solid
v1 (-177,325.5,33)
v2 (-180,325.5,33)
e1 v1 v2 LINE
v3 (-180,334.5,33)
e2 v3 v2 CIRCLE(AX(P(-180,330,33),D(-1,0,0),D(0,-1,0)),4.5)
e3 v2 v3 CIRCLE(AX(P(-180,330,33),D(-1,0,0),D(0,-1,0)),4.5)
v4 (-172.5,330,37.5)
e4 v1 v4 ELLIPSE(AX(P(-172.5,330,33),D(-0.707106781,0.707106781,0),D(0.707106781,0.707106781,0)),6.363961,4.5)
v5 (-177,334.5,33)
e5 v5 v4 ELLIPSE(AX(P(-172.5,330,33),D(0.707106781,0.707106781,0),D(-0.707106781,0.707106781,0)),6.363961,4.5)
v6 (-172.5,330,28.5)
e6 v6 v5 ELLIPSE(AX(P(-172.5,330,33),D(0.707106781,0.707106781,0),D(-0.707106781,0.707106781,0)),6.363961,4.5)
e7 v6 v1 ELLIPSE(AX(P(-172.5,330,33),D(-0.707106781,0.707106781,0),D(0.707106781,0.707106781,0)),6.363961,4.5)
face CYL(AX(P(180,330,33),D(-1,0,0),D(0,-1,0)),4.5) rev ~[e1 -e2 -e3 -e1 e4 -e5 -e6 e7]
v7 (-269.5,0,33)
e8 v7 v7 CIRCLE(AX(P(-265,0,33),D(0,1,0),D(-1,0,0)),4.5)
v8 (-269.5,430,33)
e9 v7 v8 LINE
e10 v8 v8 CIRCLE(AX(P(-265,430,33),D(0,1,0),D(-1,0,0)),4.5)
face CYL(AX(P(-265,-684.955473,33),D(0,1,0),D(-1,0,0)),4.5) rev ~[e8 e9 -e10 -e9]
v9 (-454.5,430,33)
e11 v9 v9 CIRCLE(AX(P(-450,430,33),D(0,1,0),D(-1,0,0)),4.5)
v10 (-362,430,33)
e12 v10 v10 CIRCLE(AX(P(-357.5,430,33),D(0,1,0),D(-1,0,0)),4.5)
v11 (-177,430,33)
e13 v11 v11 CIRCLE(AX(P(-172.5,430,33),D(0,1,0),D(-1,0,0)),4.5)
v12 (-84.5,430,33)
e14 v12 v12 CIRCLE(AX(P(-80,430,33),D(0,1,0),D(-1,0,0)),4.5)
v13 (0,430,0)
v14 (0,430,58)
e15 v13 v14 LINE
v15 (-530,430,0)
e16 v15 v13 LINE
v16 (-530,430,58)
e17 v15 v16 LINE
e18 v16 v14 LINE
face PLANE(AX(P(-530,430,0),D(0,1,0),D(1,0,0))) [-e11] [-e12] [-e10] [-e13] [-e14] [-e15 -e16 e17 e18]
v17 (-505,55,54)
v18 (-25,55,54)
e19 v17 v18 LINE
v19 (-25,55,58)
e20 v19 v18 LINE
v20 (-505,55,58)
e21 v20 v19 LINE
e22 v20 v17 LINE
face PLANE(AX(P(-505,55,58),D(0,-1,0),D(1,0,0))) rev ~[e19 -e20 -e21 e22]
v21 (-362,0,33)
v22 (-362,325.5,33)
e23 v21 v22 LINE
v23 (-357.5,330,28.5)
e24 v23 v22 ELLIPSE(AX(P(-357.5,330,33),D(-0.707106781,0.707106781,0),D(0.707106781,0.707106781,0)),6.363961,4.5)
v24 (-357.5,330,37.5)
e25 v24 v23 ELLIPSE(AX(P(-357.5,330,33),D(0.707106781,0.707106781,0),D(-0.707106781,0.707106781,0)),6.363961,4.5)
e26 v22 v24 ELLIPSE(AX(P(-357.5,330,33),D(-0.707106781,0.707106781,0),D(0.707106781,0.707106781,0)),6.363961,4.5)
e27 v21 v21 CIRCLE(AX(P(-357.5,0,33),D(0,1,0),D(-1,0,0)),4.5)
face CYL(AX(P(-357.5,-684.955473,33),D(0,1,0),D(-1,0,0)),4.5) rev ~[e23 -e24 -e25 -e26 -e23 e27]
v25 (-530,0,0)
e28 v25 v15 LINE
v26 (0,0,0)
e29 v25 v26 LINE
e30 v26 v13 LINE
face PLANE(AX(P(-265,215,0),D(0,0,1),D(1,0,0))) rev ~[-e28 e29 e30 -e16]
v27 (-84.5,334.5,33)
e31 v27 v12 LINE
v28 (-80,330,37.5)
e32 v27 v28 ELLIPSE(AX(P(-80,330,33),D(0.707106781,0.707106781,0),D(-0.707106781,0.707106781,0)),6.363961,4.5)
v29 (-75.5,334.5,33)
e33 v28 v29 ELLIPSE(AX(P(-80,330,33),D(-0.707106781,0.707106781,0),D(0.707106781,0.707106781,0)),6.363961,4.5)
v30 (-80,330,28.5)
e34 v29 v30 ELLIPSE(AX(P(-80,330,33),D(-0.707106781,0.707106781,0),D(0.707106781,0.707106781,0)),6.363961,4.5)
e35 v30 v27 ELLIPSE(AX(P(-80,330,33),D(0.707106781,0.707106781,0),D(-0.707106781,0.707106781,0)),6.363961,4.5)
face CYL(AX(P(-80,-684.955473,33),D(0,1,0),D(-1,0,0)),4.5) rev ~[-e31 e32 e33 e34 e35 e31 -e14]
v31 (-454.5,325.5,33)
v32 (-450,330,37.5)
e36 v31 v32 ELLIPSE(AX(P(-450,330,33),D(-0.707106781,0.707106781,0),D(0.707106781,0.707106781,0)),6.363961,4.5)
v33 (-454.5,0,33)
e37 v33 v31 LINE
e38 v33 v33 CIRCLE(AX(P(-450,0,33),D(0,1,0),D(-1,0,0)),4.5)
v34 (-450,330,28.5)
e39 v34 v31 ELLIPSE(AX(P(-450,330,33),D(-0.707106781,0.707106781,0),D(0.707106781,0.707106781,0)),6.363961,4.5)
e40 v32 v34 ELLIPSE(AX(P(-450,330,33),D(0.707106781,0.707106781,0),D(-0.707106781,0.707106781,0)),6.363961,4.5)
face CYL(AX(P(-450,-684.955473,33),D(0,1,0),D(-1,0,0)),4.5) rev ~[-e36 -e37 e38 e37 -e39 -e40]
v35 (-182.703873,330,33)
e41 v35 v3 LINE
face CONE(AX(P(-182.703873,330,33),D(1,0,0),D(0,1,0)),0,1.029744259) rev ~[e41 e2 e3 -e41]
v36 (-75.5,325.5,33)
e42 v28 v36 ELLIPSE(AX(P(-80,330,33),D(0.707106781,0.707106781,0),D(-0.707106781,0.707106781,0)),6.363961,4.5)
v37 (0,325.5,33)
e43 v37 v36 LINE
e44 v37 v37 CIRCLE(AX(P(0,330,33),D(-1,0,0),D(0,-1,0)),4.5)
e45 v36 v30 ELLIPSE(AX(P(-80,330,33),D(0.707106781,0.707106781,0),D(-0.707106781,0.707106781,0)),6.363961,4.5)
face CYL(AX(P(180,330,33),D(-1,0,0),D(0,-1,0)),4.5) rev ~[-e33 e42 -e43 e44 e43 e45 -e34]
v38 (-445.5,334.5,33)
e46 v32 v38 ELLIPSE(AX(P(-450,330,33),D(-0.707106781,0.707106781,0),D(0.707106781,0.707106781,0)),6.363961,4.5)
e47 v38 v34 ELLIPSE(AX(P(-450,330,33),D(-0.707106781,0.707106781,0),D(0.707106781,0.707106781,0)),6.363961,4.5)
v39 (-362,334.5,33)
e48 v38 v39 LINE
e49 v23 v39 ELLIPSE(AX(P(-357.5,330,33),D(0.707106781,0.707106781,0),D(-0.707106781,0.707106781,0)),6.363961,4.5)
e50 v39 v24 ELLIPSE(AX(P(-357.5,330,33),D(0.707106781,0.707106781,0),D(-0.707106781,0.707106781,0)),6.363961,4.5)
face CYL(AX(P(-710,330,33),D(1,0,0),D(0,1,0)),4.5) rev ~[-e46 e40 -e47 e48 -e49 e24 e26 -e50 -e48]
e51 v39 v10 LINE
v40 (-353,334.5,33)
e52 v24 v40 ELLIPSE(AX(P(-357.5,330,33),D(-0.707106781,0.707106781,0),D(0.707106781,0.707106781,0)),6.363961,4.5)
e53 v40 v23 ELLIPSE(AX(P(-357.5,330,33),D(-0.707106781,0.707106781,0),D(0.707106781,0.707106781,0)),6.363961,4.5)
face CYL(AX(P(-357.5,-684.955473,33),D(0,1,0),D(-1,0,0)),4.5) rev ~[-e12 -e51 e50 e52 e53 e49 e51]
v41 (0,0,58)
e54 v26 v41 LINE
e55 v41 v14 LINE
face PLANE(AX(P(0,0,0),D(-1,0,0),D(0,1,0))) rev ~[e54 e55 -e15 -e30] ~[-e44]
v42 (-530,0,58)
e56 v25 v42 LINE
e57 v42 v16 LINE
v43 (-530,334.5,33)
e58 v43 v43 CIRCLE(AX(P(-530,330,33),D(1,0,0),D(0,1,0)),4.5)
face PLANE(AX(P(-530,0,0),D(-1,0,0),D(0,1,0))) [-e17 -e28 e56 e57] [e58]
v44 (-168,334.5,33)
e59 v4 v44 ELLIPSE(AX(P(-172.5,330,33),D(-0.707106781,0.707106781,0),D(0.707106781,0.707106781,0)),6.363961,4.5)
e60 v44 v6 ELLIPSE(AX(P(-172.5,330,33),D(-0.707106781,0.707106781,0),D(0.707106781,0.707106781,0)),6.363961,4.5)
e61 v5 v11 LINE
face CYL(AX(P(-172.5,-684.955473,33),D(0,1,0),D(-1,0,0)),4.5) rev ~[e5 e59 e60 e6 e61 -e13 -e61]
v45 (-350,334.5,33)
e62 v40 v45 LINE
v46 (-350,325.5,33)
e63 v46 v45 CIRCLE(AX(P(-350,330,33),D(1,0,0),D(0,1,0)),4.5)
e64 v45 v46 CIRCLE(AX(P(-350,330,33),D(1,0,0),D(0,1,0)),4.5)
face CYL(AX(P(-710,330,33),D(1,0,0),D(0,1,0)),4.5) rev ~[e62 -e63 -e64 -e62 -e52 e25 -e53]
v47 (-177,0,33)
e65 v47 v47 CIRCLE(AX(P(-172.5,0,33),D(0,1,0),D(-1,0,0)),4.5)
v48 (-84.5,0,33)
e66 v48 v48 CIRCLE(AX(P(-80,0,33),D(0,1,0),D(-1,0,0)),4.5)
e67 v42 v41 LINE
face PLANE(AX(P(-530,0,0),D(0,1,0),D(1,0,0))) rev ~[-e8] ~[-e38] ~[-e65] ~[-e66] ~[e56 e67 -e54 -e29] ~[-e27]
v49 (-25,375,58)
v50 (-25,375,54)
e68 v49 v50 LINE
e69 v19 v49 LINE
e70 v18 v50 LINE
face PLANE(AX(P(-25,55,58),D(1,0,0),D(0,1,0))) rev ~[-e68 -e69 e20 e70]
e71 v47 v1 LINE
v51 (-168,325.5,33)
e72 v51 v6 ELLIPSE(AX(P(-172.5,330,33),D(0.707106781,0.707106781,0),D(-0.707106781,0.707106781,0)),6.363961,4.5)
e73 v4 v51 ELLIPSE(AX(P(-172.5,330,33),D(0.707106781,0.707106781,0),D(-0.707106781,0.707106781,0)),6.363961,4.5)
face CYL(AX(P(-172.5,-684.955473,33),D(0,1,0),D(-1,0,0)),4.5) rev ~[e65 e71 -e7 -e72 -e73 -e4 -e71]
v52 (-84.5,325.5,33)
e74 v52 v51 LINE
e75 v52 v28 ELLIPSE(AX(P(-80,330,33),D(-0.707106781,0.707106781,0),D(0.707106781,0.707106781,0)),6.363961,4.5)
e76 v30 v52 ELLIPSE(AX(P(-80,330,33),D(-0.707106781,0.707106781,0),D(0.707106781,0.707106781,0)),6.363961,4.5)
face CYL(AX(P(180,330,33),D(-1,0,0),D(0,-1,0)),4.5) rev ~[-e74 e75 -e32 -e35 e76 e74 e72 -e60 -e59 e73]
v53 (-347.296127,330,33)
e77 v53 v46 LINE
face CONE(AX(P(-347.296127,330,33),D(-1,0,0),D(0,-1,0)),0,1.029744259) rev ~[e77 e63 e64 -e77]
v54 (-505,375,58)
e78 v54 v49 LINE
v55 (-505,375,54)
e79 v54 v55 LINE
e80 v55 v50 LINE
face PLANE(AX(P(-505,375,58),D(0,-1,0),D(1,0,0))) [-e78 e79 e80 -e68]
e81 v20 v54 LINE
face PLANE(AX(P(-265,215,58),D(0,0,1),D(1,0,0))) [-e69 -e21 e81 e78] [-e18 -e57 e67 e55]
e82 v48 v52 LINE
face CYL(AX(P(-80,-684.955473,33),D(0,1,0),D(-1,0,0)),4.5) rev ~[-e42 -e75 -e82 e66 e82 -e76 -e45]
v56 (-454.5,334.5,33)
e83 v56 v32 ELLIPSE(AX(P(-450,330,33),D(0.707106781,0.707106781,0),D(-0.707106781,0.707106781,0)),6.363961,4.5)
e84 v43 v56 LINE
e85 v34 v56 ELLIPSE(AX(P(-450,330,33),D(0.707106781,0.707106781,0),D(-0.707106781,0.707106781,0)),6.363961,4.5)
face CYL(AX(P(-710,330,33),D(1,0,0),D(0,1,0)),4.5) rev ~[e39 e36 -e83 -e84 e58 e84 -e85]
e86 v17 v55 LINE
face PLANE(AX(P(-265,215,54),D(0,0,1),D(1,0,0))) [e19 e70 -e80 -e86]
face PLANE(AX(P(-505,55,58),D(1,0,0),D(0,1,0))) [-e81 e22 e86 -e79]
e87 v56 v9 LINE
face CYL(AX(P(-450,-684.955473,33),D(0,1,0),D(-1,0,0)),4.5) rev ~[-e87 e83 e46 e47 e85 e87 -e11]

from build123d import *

# Parameters (mm, degrees)
F0_W     = 530
F0_H     = 430
F1_DEPTH = 58
F3_D     = 9
F5_D     = 9
F5_DEPTH = 180
F5_TIP   = 2.7038727856
F7_D     = 9
F7_DEPTH = 180
F7_TIP   = 2.7038727856
F8_W     = 480
F8_H     = 320
F9_DEPTH = 4


# Not quite as in the source:
# - a feature names something its author has since deleted; it is built from what else it names


with BuildPart() as f1:
    # F0 (on Top) → F1 (new body)
    with BuildSketch(Plane.XY):
        with Locations((-265, 215)):
            Rectangle(F0_W, F0_H)
    extrude(amount=F1_DEPTH)

    # F3 (through all)
    with Locations(Plane.XZ):
        with Locations((-450, 33), (-357.5, 33), (-265, 33), (-172.5, 33), (-80, 33)):
            Hole(F3_D / 2)

    # F5
    with Locations(Plane(origin=(-530, 0, 0), x_dir=(0, -1, 0), z_dir=(-1, 0, 0))):
        with Locations((-330, 33)):
            Hole(F5_D / 2, depth=F5_DEPTH)
            with Locations((0, 0, -(F5_DEPTH + F5_TIP / 2))):  # 118° drill point
                Cone(0, F5_D / 2, F5_TIP, mode=Mode.SUBTRACT)

    # F7
    with Locations(Plane.YZ):
        with Locations((330, 33)):
            Hole(F7_D / 2, depth=F7_DEPTH)
            with Locations((0, 0, -(F7_DEPTH + F7_TIP / 2))):  # 118° drill point
                Cone(0, F7_D / 2, F7_TIP, mode=Mode.SUBTRACT)

    # F8 (on face) → F9 (cut)
    with BuildSketch(Plane.XY.offset(58)):
        with Locations((-265, 215)):
            Rectangle(F8_W, F8_H)
    extrude(amount=-F9_DEPTH, mode=Mode.SUBTRACT)


solid = f1.part
